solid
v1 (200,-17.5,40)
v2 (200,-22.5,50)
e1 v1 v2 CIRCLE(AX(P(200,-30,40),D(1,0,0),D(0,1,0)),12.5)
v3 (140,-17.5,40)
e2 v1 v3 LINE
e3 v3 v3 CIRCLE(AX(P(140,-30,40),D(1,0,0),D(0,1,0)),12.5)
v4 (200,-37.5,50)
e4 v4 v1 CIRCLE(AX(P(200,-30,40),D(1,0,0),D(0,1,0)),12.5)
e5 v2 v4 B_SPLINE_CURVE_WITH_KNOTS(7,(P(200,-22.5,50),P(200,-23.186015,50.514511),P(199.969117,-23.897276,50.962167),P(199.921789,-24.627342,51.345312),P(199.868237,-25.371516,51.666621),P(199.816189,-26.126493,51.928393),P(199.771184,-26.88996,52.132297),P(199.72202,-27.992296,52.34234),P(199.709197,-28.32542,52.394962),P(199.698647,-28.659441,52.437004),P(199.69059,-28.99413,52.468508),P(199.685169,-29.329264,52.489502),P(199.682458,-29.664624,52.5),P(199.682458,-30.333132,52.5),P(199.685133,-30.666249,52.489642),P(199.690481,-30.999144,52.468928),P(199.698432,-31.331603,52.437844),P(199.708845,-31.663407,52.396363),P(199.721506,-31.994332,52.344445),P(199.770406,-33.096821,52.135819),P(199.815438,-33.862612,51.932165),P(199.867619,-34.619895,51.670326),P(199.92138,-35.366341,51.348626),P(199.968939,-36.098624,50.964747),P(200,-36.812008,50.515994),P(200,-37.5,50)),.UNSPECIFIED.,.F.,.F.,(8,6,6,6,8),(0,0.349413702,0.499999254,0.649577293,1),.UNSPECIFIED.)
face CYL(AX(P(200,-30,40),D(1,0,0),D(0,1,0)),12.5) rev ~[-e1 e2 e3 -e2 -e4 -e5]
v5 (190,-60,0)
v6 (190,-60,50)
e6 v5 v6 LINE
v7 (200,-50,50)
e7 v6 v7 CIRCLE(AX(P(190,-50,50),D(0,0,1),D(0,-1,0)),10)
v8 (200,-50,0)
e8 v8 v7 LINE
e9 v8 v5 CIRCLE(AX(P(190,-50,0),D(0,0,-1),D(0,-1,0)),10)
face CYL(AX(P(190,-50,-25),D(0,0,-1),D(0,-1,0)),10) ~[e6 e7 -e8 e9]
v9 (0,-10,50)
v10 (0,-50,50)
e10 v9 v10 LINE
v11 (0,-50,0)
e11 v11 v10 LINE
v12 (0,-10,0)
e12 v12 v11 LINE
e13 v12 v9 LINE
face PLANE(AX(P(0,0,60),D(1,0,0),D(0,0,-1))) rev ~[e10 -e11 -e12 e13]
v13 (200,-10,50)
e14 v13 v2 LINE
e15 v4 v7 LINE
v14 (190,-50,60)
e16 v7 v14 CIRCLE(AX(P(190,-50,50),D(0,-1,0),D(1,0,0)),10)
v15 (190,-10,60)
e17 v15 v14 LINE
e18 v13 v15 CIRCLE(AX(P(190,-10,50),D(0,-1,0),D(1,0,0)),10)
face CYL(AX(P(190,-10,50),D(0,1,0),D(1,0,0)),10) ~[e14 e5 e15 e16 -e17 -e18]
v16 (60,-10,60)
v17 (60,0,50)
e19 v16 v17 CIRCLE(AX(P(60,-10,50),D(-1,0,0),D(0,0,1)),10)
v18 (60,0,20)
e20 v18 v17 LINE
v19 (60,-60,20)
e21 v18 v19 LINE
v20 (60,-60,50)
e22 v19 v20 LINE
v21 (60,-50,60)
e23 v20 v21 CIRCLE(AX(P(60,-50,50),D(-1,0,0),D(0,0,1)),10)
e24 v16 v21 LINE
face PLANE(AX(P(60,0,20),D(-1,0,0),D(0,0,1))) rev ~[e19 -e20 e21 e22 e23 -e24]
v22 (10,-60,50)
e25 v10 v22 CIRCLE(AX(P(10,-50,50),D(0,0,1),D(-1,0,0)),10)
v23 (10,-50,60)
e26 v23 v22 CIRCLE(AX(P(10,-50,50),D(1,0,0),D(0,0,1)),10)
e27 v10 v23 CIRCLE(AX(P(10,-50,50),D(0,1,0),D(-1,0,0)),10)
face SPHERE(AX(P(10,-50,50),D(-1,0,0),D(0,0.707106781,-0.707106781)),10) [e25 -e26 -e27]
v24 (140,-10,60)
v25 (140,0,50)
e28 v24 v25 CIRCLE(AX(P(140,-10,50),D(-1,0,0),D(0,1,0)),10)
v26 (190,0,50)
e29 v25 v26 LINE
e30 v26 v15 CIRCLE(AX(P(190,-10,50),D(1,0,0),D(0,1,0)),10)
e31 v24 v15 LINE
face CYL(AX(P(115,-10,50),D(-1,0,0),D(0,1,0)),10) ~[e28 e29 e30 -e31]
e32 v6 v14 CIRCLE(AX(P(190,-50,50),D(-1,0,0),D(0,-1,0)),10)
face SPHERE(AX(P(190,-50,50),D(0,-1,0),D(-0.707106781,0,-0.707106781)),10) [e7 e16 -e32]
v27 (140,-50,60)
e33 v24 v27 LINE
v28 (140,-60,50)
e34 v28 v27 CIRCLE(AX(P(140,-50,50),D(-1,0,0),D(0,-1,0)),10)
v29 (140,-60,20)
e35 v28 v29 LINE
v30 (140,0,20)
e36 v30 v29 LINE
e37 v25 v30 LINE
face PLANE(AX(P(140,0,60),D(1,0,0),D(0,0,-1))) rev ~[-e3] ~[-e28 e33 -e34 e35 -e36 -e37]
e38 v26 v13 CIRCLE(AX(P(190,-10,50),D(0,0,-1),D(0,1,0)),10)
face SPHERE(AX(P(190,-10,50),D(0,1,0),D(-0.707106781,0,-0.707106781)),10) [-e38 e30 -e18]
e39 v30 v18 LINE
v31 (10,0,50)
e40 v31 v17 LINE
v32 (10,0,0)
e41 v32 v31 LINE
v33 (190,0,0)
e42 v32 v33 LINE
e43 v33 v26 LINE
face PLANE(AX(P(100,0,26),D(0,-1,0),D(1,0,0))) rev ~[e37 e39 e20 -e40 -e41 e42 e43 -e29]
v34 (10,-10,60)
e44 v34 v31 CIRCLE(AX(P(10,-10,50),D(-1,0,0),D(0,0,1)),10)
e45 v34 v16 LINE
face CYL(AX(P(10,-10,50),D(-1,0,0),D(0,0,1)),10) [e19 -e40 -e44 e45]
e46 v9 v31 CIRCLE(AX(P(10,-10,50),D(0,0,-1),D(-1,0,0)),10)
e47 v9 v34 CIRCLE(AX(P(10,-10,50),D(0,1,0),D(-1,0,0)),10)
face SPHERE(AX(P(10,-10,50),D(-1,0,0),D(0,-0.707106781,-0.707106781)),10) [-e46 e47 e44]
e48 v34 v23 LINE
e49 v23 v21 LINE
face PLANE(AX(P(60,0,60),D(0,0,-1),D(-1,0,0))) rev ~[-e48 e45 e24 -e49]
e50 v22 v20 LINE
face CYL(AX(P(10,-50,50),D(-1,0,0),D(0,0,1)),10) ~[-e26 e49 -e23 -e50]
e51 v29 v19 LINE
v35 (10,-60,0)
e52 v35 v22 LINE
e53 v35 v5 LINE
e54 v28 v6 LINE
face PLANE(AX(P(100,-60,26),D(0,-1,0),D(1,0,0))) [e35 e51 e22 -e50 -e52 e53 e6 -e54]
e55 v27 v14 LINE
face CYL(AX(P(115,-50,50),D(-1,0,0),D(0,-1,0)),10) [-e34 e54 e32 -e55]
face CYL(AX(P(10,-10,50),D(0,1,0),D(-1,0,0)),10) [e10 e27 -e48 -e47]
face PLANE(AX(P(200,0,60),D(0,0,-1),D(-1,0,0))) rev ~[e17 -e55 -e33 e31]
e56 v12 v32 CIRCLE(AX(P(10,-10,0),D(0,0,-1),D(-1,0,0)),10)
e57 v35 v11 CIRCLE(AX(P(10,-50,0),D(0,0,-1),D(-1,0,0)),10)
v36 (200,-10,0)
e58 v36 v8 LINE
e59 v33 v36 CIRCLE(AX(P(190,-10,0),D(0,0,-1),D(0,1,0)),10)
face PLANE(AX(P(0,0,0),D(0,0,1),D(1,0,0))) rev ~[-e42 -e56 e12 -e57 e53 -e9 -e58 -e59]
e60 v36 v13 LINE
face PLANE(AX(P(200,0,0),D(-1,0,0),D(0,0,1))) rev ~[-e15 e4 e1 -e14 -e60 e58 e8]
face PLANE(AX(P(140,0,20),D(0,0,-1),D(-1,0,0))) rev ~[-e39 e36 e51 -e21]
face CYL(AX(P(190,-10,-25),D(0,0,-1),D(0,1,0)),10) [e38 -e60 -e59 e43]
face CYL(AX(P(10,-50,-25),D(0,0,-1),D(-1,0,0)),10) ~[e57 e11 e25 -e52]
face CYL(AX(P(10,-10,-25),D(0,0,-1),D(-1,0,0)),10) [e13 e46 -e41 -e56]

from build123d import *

# Parameters (mm, degrees)
F1_DEPTH     = 60
F2_R         = 12.5
F3_DEPTH     = 70
F4_T1_DEPTH  = 75
F4_T3_DEPTH  = 40
F4_T5_DEPTH  = 75
F4_T7_DEPTH  = 75
F4_S11_W     = 10
F4_S11_H     = 10
F4_T12_DEPTH = 10
F4_S17_W     = 10
F4_S17_H     = 10
F4_T18_DEPTH = 10
F4_S23_W     = 10
F4_S23_H     = 10
F4_T24_DEPTH = 10
F4_S29_W     = 10
F4_S29_H     = 10
F4_T30_DEPTH = 10


# Not quite as in the source:
# - a fillet or chamfer that OpenCascade refuses, or shapes differently, is made with other operations: its cross-section is extruded or revolved along the edge and cut away or added


with BuildPart() as f1:
    # F0 (on Front) → F1 (new body)
    with BuildSketch(Plane.XZ):
        Polygon((0, 60), (0, 0), (200, 0), (200, 60), (140, 60), (140, 20), (60, 20), (60, 60), align=None)
    extrude(amount=F1_DEPTH)

    # F2 (on face) → F3 (cut)
    with BuildSketch(Plane.YZ.offset(200)):
        with Locations((-30, 40)):
            Circle(F2_R)
    extrude(amount=-F3_DEPTH, mode=Mode.SUBTRACT)

    # F4: fillet of radius 10 on 10 edges, made by hand

    # F4_s2 → F4_t1 (cut)
    with BuildSketch(Plane.XY.offset(-25)):
        with BuildLine():
            ThreePointArc((0, -50), (2.9289321881, -57.0710678119), (10, -60))
            Line((10, -60), (0, -60))
            Line((0, -60), (0, -50))
        make_face()
        with BuildLine():
            ThreePointArc((0, -10), (2.9289321881, -2.9289321881), (10, 0))
            Line((10, 0), (0, 0))
            Line((0, 0), (0, -10))
        make_face()
        with BuildLine():
            ThreePointArc((190, -60), (197.0710678119, -57.0710678119), (200, -50))
            Line((200, -50), (200, -60))
            Line((200, -60), (190, -60))
        make_face()
        with BuildLine():
            ThreePointArc((190, 0), (197.0710678119, -2.9289321881), (200, -10))
            Line((200, -10), (200, 0))
            Line((200, 0), (190, 0))
        make_face()
    extrude(amount=F4_T1_DEPTH, mode=Mode.SUBTRACT)

    # F4_s4 → F4_t3 (cut)
    with BuildSketch(Plane.XZ.offset(10)):
        with BuildLine():
            ThreePointArc((0, 50), (2.9289321881, 57.0710678119), (10, 60))
            Line((10, 60), (0, 60))
            Line((0, 60), (0, 50))
        make_face()
        with BuildLine():
            ThreePointArc((200, 50), (197.0710678119, 57.0710678119), (190, 60))
            Line((190, 60), (200, 60))
            Line((200, 60), (200, 50))
        make_face()
    extrude(amount=F4_T3_DEPTH, mode=Mode.SUBTRACT)

    # F4_s6 → F4_t5 (cut)
    with BuildSketch(Plane.YZ.offset(10)):
        with BuildLine():
            ThreePointArc((-10, 60), (-2.9289321881, 57.0710678119), (0, 50))
            Line((0, 50), (0, 60))
            Line((0, 60), (-10, 60))
        make_face()
        with BuildLine():
            ThreePointArc((-50, 60), (-57.0710678119, 57.0710678119), (-60, 50))
            Line((-60, 50), (-60, 60))
            Line((-60, 60), (-50, 60))
        make_face()
    extrude(amount=F4_T5_DEPTH, mode=Mode.SUBTRACT)

    # F4_s8 → F4_t7 (cut)
    with BuildSketch(Plane.YZ.offset(115)):
        with BuildLine():
            ThreePointArc((-60, 50), (-57.0710678119, 57.0710678119), (-50, 60))
            Line((-50, 60), (-60, 60))
            Line((-60, 60), (-60, 50))
        make_face()
        with BuildLine():
            ThreePointArc((0, 50), (-2.9289321881, 57.0710678119), (-10, 60))
            Line((-10, 60), (0, 60))
            Line((0, 60), (0, 50))
        make_face()
    extrude(amount=F4_T7_DEPTH, mode=Mode.SUBTRACT)


with BuildPart() as f4_tool10:
    # F4_s11 → F4_t12 (new body)
    with BuildSketch(Plane.YZ.offset(10)):
        with Locations((-55, 55)):
            Rectangle(F4_S11_W, F4_S11_H)
    extrude(amount=-F4_T12_DEPTH)

    # F4_s13 → F4_t14 (revolve, cut)
    with BuildSketch(Plane(origin=(10, -50, 50), x_dir=(0, 0.7071067812, -0.7071067812), z_dir=(0, 0.7071067812, 0.7071067812))):
        with BuildLine():
            ThreePointArc((0, -10), (10, 0), (0, 10))
            Line((0, 10), (0, -10))
        make_face()
    revolve(axis=Axis((10, -50, 50), (-1, 0, 0)), mode=Mode.SUBTRACT)


with BuildPart() as f1_1:
    add(f1.part)

    # F4_t9: cut F4_tool10
    add(f4_tool10.part, mode=Mode.SUBTRACT)


with BuildPart() as f4_tool16:
    # F4_s17 → F4_t18 (new body)
    with BuildSketch(Plane.YZ.offset(10)):
        with Locations((-5, 55)):
            Rectangle(F4_S17_W, F4_S17_H)
    extrude(amount=-F4_T18_DEPTH)

    # F4_s19 → F4_t20 (revolve, cut)
    with BuildSketch(Plane(origin=(10, -10, 50), x_dir=(0, -0.7071067812, -0.7071067812), z_dir=(0, 0.7071067812, -0.7071067812))):
        with BuildLine():
            ThreePointArc((0, -10), (10, 0), (0, 10))
            Line((0, 10), (0, -10))
        make_face()
    revolve(axis=Axis((10, -10, 50), (-1, 0, 0)), mode=Mode.SUBTRACT)


with BuildPart() as f1_2:
    add(f1_1.part)

    # F4_t15: cut F4_tool16
    add(f4_tool16.part, mode=Mode.SUBTRACT)


with BuildPart() as f4_tool22:
    # F4_s23 → F4_t24 (new body)
    with BuildSketch(Plane.XZ.offset(50)):
        with Locations((195, 55)):
            Rectangle(F4_S23_W, F4_S23_H)
    extrude(amount=F4_T24_DEPTH)

    # F4_s25 → F4_t26 (revolve, cut)
    with BuildSketch(Plane(origin=(190, -50, 50), x_dir=(-0.7071067812, 0, -0.7071067812), z_dir=(-0.7071067812, 0, 0.7071067812))):
        with BuildLine():
            ThreePointArc((0, -10), (10, 0), (0, 10))
            Line((0, 10), (0, -10))
        make_face()
    revolve(axis=Axis((190, -50, 50), (0, -1, 0)), mode=Mode.SUBTRACT)


with BuildPart() as f1_3:
    add(f1_2.part)

    # F4_t21: cut F4_tool22
    add(f4_tool22.part, mode=Mode.SUBTRACT)


with BuildPart() as f4_tool28:
    # F4_s29 → F4_t30 (new body)
    with BuildSketch(Plane.XZ.offset(10)):
        with Locations((195, 55)):
            Rectangle(F4_S29_W, F4_S29_H)
    extrude(amount=-F4_T30_DEPTH)

    # F4_s31 → F4_t32 (revolve, cut)
    with BuildSketch(Plane(origin=(190, -10, 50), x_dir=(-0.7071067812, 0, -0.7071067812), z_dir=(0.7071067812, 0, -0.7071067812))):
        with BuildLine():
            ThreePointArc((0, -10), (10, 0), (0, 10))
            Line((0, 10), (0, -10))
        make_face()
    revolve(axis=Axis((190, -10, 50), (0, 1, 0)), mode=Mode.SUBTRACT)


with BuildPart() as f1_4:
    add(f1_3.part)

    # F4_t27: cut F4_tool28
    add(f4_tool28.part, mode=Mode.SUBTRACT)


solid = f1_4.part
